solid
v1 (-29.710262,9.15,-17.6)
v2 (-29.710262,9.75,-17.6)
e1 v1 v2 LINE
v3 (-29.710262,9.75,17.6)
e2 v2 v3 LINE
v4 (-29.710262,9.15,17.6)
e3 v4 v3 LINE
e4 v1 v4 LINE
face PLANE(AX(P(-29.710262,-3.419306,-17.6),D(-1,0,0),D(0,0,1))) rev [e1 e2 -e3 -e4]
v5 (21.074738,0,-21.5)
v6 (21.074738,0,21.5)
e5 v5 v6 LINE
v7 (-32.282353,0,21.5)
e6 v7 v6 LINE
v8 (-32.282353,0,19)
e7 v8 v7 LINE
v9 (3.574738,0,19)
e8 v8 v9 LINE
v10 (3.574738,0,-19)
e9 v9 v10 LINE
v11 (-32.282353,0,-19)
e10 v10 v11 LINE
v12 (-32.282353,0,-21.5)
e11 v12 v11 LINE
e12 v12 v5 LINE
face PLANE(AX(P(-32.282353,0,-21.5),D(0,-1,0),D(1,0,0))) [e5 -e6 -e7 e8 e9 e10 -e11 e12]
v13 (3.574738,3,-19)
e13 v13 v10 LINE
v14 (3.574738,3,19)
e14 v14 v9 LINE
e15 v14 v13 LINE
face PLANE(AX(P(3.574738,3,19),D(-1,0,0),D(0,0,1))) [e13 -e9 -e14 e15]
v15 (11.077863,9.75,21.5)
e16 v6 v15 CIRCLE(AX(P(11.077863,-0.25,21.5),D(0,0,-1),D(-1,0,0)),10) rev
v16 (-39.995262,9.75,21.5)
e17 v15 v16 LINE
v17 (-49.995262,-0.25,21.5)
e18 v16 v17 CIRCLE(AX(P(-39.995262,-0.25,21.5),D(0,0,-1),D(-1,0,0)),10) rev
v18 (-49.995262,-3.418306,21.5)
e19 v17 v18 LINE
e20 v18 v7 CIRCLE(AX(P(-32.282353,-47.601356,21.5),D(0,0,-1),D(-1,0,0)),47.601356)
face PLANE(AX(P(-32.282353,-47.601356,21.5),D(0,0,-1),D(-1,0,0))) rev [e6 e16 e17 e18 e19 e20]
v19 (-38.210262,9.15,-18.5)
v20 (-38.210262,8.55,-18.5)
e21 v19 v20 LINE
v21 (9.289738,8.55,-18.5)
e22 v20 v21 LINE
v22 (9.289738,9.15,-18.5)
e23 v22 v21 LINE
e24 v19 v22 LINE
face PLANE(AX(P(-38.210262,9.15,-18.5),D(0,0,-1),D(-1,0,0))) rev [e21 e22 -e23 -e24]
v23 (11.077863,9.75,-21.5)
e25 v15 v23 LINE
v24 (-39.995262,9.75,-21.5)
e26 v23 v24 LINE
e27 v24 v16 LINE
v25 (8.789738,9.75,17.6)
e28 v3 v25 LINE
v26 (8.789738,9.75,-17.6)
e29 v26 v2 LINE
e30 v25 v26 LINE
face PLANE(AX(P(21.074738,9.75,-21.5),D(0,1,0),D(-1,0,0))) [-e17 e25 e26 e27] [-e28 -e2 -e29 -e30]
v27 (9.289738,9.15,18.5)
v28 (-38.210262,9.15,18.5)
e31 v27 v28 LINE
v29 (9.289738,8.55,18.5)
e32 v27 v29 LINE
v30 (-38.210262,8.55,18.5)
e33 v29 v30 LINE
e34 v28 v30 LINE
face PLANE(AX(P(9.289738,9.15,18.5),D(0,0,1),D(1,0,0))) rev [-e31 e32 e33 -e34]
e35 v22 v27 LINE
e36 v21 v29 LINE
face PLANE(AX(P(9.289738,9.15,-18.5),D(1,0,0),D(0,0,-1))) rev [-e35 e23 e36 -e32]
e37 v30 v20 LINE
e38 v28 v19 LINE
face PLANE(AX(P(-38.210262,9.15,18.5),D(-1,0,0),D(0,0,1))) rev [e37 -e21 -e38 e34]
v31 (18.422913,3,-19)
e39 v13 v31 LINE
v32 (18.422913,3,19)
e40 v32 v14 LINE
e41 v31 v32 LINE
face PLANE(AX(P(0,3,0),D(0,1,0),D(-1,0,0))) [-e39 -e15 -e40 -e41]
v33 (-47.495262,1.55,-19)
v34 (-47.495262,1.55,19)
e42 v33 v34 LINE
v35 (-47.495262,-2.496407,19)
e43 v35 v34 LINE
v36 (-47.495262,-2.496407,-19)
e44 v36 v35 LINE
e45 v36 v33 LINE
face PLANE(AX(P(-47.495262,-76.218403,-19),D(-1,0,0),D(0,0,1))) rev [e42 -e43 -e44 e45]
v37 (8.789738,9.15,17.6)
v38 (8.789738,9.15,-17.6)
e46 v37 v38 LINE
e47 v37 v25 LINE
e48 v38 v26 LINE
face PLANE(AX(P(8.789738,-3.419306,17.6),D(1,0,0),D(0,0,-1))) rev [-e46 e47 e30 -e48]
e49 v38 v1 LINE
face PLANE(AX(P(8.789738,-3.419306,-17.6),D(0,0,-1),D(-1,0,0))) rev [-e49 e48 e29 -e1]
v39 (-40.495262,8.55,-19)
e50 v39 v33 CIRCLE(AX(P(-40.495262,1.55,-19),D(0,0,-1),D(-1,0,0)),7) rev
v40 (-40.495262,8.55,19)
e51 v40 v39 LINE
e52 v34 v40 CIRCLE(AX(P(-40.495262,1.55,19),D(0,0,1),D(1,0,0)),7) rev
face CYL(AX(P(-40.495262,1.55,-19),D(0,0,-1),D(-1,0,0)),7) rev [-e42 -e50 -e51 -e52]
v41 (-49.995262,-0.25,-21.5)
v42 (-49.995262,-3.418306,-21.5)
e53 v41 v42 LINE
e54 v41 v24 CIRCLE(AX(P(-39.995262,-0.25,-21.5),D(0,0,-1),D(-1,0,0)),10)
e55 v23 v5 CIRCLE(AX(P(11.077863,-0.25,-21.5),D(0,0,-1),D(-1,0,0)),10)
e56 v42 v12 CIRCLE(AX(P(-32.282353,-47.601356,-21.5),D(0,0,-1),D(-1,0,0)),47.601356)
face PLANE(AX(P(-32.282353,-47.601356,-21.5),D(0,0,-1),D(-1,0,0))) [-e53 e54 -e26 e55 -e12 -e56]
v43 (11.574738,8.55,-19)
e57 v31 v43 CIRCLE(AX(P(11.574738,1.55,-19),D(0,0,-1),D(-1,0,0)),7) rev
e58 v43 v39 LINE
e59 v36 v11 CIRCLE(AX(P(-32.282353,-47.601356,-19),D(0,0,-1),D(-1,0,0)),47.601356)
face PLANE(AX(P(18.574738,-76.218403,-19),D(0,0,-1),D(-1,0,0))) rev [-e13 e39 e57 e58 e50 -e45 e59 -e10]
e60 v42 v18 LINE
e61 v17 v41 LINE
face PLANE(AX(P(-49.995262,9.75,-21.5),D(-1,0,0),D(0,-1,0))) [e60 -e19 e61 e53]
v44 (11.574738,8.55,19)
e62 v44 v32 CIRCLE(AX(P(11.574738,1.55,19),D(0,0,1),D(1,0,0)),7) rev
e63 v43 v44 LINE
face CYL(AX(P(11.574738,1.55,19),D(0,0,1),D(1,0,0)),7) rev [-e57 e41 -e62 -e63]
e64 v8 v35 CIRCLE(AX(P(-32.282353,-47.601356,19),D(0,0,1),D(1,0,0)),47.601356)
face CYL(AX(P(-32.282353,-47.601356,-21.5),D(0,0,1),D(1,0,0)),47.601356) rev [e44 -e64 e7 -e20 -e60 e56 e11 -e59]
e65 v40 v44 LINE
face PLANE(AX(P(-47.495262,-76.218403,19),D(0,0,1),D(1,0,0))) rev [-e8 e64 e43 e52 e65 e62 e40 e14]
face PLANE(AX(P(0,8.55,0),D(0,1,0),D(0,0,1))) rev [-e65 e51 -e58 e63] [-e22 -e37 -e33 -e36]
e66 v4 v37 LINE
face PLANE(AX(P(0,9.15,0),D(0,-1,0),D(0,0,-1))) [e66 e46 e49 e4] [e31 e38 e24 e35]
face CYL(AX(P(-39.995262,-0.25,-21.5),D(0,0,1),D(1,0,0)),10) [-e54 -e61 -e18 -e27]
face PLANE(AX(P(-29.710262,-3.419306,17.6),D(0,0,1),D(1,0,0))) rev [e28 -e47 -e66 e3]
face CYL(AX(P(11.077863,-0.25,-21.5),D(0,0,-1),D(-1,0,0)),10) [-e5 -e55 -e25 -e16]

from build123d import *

# Parameters (mm, degrees)
BOSS_EXTRUDE1_DEPTH = 43
CUT_EXTRUDE1_START  = -8.55
SKETCH3_W           = 66.07
SKETCH3_H           = 38
CUT_EXTRUDE1_DEPTH  = 8.55
SKETCH4_W           = 47.5
SKETCH4_H           = 37
CUT_EXTRUDE2_DEPTH  = 0.6
CUT_EXTRUDE3_REACH  = 57.993
SKETCH5_W           = 38.5
SKETCH5_H           = 35.2
FILLET1_R           = 7
FILLET2_R           = 10
SKETCH6_W           = 0.5
SKETCH6_H           = 38
CUT_EXTRUDE4_DEPTH  = 10
SKETCH7_W           = 14.712909767
SKETCH7_H           = 38
BOSS_EXTRUDE2_DEPTH = 1.5
CUT_EXTRUDE5_REACH  = 57.044
SKETCH8_W           = 14.712909767
SKETCH8_H           = 38
SKETCH9_W           = 15
SKETCH9_H           = 38
BOSS_EXTRUDE3_DEPTH = 3


with BuildPart() as part:
    # Sketch1 → Boss-Extrude1 (new body)
    with BuildSketch(Plane.XY.offset(21.5)):
        with BuildLine():
            Line((21.074737692, 0), (21.074737692, 9.75))
            Line((21.074737692, 9.75), (-49.995262308, 9.75))
            Line((-49.995262308, 9.75), (-49.995262308, -3.418305859))
            ThreePointArc((-49.995262308, -3.418305859), (-41.302219327, -0.862388361), (-32.282352541, 0))
            Line((-32.282352541, 0), (21.074737692, 0))
        make_face()
    extrude(amount=-BOSS_EXTRUDE1_DEPTH)

    # Sketch3 → Cut-Extrude1 (cut)
    with BuildSketch(Plane(origin=(0, 8.55, 0), x_dir=(1, 0, 0), z_dir=(0, 1, 0)).offset(CUT_EXTRUDE1_START)):
        with Locations((-14.460262308, 0)):
            Rectangle(SKETCH3_W, SKETCH3_H)
    extrude(amount=CUT_EXTRUDE1_DEPTH, mode=Mode.SUBTRACT)

    # Sketch4 → Cut-Extrude2 (cut)
    with BuildSketch(Plane.XZ.offset(-8.55)):
        with Locations((-14.460262308, 0)):
            Rectangle(SKETCH4_W, SKETCH4_H)
    extrude(amount=-CUT_EXTRUDE2_DEPTH, mode=Mode.SUBTRACT)

    # Sketch5 → Cut-Extrude3 (cut, up to next)
    with BuildSketch(Plane(origin=(0, 9.75, 0), x_dir=(-1, 0, 0), z_dir=(0, 1, 0)), mode=Mode.PRIVATE) as cut_extrude3_sk1:
        with Locations((10.460262308, 0)):
            Rectangle(SKETCH5_W, SKETCH5_H)
    cut_extrude3_tool1 = extrude(cut_extrude3_sk1.sketch, amount=-CUT_EXTRUDE3_REACH, mode=Mode.PRIVATE) & part.part
    add(cut_extrude3_tool1.solids().sort_by_distance((-10.460262, 9.75, 0))[0], mode=Mode.SUBTRACT)

    # Fillet1
    fillet1_edges = [part.edges().sort_by_distance(p)[0] for p in [
        (18.574737692, 8.55, 0),
        (-47.495262308, 8.55, 0),
    ]]
    fillet(fillet1_edges, radius=FILLET1_R)

    # Fillet2
    # the kernel refuses this fillet: 10 mm, written as the material it takes off along each edge
    with BuildSketch(Plane(origin=(21.074737692, 9.75, 46.492186279), x_dir=(0, -1, 0), z_dir=(0, 0, -1))) as fillet2_piece_1:
        with BuildLine():
            CenterArc((10, 9.996874512), FILLET2_R, 180, 88.567456262)
            Line((0, 9.996874512), (-0.2, 9.996874512))
            Line((-0.2, 9.996874512), (-0.2, 0))
            Line((-0.2, 0), (0, -0.2))
            ThreePointArc((0, -0.2), (4.875, -0.2), (9.745, -0.19993749))
            Line((9.745, -0.19993749), (9.75, 0))
        make_face()
    extrude(amount=92.984372558, mode=Mode.SUBTRACT)
    with BuildSketch(Plane(origin=(-49.995262308, 9.75, 46.5), x_dir=(1, 0, 0), z_dir=(0, 0, -1))) as fillet2_piece_2:
        with BuildLine():
            CenterArc((FILLET2_R, FILLET2_R), FILLET2_R, 180, 90)
            Line((0, FILLET2_R), (-FILLET2_R * 0.02, FILLET2_R))
            Line((-FILLET2_R * 0.02, FILLET2_R), (-FILLET2_R * 0.02, -FILLET2_R * 0.02))
            Line((-FILLET2_R * 0.02, -FILLET2_R * 0.02), (FILLET2_R, -FILLET2_R * 0.02))
            Line((FILLET2_R, -FILLET2_R * 0.02), (FILLET2_R, 0))
        make_face()
    extrude(amount=93, mode=Mode.SUBTRACT)

    # Sketch6 → Cut-Extrude4 (cut)
    with BuildSketch(Plane(origin=(0, 0, 0), x_dir=(1, 0, 0), z_dir=(0, 1, 0))):
        with Locations((-32.532352541, 0)):
            Rectangle(SKETCH6_W, SKETCH6_H)
    extrude(amount=-CUT_EXTRUDE4_DEPTH, mode=Mode.SUBTRACT)

    # Sketch7 → Boss-Extrude2 (add)
    with BuildSketch(Plane(origin=(0, 0, 0), x_dir=(1, 0, 0), z_dir=(0, 1, 0))):
        with Locations((-40.138807425, 0)):
            Rectangle(SKETCH7_W, SKETCH7_H)
    extrude(amount=BOSS_EXTRUDE2_DEPTH)

    # Sketch8 → Cut-Extrude5 (cut, up to next)
    with BuildSketch(Plane(origin=(0, 1.5, 0), x_dir=(1, 0, 0), z_dir=(0, 1, 0)), mode=Mode.PRIVATE) as cut_extrude5_sk1:
        with Locations((-40.138807425, 0)):
            Rectangle(SKETCH8_W, SKETCH8_H)
    cut_extrude5_tool1 = extrude(cut_extrude5_sk1.sketch, amount=-CUT_EXTRUDE5_REACH, mode=Mode.PRIVATE) & part.part
    add(cut_extrude5_tool1.solids().sort_by_distance((-40.138807, 1.5, 0))[0], mode=Mode.SUBTRACT)

    # Sketch9 → Boss-Extrude3 (add)
    with BuildSketch(Plane.XZ):
        with Locations((11.074737692, 0)):
            Rectangle(SKETCH9_W, SKETCH9_H)
    extrude(amount=-BOSS_EXTRUDE3_DEPTH)


solid = part.part
